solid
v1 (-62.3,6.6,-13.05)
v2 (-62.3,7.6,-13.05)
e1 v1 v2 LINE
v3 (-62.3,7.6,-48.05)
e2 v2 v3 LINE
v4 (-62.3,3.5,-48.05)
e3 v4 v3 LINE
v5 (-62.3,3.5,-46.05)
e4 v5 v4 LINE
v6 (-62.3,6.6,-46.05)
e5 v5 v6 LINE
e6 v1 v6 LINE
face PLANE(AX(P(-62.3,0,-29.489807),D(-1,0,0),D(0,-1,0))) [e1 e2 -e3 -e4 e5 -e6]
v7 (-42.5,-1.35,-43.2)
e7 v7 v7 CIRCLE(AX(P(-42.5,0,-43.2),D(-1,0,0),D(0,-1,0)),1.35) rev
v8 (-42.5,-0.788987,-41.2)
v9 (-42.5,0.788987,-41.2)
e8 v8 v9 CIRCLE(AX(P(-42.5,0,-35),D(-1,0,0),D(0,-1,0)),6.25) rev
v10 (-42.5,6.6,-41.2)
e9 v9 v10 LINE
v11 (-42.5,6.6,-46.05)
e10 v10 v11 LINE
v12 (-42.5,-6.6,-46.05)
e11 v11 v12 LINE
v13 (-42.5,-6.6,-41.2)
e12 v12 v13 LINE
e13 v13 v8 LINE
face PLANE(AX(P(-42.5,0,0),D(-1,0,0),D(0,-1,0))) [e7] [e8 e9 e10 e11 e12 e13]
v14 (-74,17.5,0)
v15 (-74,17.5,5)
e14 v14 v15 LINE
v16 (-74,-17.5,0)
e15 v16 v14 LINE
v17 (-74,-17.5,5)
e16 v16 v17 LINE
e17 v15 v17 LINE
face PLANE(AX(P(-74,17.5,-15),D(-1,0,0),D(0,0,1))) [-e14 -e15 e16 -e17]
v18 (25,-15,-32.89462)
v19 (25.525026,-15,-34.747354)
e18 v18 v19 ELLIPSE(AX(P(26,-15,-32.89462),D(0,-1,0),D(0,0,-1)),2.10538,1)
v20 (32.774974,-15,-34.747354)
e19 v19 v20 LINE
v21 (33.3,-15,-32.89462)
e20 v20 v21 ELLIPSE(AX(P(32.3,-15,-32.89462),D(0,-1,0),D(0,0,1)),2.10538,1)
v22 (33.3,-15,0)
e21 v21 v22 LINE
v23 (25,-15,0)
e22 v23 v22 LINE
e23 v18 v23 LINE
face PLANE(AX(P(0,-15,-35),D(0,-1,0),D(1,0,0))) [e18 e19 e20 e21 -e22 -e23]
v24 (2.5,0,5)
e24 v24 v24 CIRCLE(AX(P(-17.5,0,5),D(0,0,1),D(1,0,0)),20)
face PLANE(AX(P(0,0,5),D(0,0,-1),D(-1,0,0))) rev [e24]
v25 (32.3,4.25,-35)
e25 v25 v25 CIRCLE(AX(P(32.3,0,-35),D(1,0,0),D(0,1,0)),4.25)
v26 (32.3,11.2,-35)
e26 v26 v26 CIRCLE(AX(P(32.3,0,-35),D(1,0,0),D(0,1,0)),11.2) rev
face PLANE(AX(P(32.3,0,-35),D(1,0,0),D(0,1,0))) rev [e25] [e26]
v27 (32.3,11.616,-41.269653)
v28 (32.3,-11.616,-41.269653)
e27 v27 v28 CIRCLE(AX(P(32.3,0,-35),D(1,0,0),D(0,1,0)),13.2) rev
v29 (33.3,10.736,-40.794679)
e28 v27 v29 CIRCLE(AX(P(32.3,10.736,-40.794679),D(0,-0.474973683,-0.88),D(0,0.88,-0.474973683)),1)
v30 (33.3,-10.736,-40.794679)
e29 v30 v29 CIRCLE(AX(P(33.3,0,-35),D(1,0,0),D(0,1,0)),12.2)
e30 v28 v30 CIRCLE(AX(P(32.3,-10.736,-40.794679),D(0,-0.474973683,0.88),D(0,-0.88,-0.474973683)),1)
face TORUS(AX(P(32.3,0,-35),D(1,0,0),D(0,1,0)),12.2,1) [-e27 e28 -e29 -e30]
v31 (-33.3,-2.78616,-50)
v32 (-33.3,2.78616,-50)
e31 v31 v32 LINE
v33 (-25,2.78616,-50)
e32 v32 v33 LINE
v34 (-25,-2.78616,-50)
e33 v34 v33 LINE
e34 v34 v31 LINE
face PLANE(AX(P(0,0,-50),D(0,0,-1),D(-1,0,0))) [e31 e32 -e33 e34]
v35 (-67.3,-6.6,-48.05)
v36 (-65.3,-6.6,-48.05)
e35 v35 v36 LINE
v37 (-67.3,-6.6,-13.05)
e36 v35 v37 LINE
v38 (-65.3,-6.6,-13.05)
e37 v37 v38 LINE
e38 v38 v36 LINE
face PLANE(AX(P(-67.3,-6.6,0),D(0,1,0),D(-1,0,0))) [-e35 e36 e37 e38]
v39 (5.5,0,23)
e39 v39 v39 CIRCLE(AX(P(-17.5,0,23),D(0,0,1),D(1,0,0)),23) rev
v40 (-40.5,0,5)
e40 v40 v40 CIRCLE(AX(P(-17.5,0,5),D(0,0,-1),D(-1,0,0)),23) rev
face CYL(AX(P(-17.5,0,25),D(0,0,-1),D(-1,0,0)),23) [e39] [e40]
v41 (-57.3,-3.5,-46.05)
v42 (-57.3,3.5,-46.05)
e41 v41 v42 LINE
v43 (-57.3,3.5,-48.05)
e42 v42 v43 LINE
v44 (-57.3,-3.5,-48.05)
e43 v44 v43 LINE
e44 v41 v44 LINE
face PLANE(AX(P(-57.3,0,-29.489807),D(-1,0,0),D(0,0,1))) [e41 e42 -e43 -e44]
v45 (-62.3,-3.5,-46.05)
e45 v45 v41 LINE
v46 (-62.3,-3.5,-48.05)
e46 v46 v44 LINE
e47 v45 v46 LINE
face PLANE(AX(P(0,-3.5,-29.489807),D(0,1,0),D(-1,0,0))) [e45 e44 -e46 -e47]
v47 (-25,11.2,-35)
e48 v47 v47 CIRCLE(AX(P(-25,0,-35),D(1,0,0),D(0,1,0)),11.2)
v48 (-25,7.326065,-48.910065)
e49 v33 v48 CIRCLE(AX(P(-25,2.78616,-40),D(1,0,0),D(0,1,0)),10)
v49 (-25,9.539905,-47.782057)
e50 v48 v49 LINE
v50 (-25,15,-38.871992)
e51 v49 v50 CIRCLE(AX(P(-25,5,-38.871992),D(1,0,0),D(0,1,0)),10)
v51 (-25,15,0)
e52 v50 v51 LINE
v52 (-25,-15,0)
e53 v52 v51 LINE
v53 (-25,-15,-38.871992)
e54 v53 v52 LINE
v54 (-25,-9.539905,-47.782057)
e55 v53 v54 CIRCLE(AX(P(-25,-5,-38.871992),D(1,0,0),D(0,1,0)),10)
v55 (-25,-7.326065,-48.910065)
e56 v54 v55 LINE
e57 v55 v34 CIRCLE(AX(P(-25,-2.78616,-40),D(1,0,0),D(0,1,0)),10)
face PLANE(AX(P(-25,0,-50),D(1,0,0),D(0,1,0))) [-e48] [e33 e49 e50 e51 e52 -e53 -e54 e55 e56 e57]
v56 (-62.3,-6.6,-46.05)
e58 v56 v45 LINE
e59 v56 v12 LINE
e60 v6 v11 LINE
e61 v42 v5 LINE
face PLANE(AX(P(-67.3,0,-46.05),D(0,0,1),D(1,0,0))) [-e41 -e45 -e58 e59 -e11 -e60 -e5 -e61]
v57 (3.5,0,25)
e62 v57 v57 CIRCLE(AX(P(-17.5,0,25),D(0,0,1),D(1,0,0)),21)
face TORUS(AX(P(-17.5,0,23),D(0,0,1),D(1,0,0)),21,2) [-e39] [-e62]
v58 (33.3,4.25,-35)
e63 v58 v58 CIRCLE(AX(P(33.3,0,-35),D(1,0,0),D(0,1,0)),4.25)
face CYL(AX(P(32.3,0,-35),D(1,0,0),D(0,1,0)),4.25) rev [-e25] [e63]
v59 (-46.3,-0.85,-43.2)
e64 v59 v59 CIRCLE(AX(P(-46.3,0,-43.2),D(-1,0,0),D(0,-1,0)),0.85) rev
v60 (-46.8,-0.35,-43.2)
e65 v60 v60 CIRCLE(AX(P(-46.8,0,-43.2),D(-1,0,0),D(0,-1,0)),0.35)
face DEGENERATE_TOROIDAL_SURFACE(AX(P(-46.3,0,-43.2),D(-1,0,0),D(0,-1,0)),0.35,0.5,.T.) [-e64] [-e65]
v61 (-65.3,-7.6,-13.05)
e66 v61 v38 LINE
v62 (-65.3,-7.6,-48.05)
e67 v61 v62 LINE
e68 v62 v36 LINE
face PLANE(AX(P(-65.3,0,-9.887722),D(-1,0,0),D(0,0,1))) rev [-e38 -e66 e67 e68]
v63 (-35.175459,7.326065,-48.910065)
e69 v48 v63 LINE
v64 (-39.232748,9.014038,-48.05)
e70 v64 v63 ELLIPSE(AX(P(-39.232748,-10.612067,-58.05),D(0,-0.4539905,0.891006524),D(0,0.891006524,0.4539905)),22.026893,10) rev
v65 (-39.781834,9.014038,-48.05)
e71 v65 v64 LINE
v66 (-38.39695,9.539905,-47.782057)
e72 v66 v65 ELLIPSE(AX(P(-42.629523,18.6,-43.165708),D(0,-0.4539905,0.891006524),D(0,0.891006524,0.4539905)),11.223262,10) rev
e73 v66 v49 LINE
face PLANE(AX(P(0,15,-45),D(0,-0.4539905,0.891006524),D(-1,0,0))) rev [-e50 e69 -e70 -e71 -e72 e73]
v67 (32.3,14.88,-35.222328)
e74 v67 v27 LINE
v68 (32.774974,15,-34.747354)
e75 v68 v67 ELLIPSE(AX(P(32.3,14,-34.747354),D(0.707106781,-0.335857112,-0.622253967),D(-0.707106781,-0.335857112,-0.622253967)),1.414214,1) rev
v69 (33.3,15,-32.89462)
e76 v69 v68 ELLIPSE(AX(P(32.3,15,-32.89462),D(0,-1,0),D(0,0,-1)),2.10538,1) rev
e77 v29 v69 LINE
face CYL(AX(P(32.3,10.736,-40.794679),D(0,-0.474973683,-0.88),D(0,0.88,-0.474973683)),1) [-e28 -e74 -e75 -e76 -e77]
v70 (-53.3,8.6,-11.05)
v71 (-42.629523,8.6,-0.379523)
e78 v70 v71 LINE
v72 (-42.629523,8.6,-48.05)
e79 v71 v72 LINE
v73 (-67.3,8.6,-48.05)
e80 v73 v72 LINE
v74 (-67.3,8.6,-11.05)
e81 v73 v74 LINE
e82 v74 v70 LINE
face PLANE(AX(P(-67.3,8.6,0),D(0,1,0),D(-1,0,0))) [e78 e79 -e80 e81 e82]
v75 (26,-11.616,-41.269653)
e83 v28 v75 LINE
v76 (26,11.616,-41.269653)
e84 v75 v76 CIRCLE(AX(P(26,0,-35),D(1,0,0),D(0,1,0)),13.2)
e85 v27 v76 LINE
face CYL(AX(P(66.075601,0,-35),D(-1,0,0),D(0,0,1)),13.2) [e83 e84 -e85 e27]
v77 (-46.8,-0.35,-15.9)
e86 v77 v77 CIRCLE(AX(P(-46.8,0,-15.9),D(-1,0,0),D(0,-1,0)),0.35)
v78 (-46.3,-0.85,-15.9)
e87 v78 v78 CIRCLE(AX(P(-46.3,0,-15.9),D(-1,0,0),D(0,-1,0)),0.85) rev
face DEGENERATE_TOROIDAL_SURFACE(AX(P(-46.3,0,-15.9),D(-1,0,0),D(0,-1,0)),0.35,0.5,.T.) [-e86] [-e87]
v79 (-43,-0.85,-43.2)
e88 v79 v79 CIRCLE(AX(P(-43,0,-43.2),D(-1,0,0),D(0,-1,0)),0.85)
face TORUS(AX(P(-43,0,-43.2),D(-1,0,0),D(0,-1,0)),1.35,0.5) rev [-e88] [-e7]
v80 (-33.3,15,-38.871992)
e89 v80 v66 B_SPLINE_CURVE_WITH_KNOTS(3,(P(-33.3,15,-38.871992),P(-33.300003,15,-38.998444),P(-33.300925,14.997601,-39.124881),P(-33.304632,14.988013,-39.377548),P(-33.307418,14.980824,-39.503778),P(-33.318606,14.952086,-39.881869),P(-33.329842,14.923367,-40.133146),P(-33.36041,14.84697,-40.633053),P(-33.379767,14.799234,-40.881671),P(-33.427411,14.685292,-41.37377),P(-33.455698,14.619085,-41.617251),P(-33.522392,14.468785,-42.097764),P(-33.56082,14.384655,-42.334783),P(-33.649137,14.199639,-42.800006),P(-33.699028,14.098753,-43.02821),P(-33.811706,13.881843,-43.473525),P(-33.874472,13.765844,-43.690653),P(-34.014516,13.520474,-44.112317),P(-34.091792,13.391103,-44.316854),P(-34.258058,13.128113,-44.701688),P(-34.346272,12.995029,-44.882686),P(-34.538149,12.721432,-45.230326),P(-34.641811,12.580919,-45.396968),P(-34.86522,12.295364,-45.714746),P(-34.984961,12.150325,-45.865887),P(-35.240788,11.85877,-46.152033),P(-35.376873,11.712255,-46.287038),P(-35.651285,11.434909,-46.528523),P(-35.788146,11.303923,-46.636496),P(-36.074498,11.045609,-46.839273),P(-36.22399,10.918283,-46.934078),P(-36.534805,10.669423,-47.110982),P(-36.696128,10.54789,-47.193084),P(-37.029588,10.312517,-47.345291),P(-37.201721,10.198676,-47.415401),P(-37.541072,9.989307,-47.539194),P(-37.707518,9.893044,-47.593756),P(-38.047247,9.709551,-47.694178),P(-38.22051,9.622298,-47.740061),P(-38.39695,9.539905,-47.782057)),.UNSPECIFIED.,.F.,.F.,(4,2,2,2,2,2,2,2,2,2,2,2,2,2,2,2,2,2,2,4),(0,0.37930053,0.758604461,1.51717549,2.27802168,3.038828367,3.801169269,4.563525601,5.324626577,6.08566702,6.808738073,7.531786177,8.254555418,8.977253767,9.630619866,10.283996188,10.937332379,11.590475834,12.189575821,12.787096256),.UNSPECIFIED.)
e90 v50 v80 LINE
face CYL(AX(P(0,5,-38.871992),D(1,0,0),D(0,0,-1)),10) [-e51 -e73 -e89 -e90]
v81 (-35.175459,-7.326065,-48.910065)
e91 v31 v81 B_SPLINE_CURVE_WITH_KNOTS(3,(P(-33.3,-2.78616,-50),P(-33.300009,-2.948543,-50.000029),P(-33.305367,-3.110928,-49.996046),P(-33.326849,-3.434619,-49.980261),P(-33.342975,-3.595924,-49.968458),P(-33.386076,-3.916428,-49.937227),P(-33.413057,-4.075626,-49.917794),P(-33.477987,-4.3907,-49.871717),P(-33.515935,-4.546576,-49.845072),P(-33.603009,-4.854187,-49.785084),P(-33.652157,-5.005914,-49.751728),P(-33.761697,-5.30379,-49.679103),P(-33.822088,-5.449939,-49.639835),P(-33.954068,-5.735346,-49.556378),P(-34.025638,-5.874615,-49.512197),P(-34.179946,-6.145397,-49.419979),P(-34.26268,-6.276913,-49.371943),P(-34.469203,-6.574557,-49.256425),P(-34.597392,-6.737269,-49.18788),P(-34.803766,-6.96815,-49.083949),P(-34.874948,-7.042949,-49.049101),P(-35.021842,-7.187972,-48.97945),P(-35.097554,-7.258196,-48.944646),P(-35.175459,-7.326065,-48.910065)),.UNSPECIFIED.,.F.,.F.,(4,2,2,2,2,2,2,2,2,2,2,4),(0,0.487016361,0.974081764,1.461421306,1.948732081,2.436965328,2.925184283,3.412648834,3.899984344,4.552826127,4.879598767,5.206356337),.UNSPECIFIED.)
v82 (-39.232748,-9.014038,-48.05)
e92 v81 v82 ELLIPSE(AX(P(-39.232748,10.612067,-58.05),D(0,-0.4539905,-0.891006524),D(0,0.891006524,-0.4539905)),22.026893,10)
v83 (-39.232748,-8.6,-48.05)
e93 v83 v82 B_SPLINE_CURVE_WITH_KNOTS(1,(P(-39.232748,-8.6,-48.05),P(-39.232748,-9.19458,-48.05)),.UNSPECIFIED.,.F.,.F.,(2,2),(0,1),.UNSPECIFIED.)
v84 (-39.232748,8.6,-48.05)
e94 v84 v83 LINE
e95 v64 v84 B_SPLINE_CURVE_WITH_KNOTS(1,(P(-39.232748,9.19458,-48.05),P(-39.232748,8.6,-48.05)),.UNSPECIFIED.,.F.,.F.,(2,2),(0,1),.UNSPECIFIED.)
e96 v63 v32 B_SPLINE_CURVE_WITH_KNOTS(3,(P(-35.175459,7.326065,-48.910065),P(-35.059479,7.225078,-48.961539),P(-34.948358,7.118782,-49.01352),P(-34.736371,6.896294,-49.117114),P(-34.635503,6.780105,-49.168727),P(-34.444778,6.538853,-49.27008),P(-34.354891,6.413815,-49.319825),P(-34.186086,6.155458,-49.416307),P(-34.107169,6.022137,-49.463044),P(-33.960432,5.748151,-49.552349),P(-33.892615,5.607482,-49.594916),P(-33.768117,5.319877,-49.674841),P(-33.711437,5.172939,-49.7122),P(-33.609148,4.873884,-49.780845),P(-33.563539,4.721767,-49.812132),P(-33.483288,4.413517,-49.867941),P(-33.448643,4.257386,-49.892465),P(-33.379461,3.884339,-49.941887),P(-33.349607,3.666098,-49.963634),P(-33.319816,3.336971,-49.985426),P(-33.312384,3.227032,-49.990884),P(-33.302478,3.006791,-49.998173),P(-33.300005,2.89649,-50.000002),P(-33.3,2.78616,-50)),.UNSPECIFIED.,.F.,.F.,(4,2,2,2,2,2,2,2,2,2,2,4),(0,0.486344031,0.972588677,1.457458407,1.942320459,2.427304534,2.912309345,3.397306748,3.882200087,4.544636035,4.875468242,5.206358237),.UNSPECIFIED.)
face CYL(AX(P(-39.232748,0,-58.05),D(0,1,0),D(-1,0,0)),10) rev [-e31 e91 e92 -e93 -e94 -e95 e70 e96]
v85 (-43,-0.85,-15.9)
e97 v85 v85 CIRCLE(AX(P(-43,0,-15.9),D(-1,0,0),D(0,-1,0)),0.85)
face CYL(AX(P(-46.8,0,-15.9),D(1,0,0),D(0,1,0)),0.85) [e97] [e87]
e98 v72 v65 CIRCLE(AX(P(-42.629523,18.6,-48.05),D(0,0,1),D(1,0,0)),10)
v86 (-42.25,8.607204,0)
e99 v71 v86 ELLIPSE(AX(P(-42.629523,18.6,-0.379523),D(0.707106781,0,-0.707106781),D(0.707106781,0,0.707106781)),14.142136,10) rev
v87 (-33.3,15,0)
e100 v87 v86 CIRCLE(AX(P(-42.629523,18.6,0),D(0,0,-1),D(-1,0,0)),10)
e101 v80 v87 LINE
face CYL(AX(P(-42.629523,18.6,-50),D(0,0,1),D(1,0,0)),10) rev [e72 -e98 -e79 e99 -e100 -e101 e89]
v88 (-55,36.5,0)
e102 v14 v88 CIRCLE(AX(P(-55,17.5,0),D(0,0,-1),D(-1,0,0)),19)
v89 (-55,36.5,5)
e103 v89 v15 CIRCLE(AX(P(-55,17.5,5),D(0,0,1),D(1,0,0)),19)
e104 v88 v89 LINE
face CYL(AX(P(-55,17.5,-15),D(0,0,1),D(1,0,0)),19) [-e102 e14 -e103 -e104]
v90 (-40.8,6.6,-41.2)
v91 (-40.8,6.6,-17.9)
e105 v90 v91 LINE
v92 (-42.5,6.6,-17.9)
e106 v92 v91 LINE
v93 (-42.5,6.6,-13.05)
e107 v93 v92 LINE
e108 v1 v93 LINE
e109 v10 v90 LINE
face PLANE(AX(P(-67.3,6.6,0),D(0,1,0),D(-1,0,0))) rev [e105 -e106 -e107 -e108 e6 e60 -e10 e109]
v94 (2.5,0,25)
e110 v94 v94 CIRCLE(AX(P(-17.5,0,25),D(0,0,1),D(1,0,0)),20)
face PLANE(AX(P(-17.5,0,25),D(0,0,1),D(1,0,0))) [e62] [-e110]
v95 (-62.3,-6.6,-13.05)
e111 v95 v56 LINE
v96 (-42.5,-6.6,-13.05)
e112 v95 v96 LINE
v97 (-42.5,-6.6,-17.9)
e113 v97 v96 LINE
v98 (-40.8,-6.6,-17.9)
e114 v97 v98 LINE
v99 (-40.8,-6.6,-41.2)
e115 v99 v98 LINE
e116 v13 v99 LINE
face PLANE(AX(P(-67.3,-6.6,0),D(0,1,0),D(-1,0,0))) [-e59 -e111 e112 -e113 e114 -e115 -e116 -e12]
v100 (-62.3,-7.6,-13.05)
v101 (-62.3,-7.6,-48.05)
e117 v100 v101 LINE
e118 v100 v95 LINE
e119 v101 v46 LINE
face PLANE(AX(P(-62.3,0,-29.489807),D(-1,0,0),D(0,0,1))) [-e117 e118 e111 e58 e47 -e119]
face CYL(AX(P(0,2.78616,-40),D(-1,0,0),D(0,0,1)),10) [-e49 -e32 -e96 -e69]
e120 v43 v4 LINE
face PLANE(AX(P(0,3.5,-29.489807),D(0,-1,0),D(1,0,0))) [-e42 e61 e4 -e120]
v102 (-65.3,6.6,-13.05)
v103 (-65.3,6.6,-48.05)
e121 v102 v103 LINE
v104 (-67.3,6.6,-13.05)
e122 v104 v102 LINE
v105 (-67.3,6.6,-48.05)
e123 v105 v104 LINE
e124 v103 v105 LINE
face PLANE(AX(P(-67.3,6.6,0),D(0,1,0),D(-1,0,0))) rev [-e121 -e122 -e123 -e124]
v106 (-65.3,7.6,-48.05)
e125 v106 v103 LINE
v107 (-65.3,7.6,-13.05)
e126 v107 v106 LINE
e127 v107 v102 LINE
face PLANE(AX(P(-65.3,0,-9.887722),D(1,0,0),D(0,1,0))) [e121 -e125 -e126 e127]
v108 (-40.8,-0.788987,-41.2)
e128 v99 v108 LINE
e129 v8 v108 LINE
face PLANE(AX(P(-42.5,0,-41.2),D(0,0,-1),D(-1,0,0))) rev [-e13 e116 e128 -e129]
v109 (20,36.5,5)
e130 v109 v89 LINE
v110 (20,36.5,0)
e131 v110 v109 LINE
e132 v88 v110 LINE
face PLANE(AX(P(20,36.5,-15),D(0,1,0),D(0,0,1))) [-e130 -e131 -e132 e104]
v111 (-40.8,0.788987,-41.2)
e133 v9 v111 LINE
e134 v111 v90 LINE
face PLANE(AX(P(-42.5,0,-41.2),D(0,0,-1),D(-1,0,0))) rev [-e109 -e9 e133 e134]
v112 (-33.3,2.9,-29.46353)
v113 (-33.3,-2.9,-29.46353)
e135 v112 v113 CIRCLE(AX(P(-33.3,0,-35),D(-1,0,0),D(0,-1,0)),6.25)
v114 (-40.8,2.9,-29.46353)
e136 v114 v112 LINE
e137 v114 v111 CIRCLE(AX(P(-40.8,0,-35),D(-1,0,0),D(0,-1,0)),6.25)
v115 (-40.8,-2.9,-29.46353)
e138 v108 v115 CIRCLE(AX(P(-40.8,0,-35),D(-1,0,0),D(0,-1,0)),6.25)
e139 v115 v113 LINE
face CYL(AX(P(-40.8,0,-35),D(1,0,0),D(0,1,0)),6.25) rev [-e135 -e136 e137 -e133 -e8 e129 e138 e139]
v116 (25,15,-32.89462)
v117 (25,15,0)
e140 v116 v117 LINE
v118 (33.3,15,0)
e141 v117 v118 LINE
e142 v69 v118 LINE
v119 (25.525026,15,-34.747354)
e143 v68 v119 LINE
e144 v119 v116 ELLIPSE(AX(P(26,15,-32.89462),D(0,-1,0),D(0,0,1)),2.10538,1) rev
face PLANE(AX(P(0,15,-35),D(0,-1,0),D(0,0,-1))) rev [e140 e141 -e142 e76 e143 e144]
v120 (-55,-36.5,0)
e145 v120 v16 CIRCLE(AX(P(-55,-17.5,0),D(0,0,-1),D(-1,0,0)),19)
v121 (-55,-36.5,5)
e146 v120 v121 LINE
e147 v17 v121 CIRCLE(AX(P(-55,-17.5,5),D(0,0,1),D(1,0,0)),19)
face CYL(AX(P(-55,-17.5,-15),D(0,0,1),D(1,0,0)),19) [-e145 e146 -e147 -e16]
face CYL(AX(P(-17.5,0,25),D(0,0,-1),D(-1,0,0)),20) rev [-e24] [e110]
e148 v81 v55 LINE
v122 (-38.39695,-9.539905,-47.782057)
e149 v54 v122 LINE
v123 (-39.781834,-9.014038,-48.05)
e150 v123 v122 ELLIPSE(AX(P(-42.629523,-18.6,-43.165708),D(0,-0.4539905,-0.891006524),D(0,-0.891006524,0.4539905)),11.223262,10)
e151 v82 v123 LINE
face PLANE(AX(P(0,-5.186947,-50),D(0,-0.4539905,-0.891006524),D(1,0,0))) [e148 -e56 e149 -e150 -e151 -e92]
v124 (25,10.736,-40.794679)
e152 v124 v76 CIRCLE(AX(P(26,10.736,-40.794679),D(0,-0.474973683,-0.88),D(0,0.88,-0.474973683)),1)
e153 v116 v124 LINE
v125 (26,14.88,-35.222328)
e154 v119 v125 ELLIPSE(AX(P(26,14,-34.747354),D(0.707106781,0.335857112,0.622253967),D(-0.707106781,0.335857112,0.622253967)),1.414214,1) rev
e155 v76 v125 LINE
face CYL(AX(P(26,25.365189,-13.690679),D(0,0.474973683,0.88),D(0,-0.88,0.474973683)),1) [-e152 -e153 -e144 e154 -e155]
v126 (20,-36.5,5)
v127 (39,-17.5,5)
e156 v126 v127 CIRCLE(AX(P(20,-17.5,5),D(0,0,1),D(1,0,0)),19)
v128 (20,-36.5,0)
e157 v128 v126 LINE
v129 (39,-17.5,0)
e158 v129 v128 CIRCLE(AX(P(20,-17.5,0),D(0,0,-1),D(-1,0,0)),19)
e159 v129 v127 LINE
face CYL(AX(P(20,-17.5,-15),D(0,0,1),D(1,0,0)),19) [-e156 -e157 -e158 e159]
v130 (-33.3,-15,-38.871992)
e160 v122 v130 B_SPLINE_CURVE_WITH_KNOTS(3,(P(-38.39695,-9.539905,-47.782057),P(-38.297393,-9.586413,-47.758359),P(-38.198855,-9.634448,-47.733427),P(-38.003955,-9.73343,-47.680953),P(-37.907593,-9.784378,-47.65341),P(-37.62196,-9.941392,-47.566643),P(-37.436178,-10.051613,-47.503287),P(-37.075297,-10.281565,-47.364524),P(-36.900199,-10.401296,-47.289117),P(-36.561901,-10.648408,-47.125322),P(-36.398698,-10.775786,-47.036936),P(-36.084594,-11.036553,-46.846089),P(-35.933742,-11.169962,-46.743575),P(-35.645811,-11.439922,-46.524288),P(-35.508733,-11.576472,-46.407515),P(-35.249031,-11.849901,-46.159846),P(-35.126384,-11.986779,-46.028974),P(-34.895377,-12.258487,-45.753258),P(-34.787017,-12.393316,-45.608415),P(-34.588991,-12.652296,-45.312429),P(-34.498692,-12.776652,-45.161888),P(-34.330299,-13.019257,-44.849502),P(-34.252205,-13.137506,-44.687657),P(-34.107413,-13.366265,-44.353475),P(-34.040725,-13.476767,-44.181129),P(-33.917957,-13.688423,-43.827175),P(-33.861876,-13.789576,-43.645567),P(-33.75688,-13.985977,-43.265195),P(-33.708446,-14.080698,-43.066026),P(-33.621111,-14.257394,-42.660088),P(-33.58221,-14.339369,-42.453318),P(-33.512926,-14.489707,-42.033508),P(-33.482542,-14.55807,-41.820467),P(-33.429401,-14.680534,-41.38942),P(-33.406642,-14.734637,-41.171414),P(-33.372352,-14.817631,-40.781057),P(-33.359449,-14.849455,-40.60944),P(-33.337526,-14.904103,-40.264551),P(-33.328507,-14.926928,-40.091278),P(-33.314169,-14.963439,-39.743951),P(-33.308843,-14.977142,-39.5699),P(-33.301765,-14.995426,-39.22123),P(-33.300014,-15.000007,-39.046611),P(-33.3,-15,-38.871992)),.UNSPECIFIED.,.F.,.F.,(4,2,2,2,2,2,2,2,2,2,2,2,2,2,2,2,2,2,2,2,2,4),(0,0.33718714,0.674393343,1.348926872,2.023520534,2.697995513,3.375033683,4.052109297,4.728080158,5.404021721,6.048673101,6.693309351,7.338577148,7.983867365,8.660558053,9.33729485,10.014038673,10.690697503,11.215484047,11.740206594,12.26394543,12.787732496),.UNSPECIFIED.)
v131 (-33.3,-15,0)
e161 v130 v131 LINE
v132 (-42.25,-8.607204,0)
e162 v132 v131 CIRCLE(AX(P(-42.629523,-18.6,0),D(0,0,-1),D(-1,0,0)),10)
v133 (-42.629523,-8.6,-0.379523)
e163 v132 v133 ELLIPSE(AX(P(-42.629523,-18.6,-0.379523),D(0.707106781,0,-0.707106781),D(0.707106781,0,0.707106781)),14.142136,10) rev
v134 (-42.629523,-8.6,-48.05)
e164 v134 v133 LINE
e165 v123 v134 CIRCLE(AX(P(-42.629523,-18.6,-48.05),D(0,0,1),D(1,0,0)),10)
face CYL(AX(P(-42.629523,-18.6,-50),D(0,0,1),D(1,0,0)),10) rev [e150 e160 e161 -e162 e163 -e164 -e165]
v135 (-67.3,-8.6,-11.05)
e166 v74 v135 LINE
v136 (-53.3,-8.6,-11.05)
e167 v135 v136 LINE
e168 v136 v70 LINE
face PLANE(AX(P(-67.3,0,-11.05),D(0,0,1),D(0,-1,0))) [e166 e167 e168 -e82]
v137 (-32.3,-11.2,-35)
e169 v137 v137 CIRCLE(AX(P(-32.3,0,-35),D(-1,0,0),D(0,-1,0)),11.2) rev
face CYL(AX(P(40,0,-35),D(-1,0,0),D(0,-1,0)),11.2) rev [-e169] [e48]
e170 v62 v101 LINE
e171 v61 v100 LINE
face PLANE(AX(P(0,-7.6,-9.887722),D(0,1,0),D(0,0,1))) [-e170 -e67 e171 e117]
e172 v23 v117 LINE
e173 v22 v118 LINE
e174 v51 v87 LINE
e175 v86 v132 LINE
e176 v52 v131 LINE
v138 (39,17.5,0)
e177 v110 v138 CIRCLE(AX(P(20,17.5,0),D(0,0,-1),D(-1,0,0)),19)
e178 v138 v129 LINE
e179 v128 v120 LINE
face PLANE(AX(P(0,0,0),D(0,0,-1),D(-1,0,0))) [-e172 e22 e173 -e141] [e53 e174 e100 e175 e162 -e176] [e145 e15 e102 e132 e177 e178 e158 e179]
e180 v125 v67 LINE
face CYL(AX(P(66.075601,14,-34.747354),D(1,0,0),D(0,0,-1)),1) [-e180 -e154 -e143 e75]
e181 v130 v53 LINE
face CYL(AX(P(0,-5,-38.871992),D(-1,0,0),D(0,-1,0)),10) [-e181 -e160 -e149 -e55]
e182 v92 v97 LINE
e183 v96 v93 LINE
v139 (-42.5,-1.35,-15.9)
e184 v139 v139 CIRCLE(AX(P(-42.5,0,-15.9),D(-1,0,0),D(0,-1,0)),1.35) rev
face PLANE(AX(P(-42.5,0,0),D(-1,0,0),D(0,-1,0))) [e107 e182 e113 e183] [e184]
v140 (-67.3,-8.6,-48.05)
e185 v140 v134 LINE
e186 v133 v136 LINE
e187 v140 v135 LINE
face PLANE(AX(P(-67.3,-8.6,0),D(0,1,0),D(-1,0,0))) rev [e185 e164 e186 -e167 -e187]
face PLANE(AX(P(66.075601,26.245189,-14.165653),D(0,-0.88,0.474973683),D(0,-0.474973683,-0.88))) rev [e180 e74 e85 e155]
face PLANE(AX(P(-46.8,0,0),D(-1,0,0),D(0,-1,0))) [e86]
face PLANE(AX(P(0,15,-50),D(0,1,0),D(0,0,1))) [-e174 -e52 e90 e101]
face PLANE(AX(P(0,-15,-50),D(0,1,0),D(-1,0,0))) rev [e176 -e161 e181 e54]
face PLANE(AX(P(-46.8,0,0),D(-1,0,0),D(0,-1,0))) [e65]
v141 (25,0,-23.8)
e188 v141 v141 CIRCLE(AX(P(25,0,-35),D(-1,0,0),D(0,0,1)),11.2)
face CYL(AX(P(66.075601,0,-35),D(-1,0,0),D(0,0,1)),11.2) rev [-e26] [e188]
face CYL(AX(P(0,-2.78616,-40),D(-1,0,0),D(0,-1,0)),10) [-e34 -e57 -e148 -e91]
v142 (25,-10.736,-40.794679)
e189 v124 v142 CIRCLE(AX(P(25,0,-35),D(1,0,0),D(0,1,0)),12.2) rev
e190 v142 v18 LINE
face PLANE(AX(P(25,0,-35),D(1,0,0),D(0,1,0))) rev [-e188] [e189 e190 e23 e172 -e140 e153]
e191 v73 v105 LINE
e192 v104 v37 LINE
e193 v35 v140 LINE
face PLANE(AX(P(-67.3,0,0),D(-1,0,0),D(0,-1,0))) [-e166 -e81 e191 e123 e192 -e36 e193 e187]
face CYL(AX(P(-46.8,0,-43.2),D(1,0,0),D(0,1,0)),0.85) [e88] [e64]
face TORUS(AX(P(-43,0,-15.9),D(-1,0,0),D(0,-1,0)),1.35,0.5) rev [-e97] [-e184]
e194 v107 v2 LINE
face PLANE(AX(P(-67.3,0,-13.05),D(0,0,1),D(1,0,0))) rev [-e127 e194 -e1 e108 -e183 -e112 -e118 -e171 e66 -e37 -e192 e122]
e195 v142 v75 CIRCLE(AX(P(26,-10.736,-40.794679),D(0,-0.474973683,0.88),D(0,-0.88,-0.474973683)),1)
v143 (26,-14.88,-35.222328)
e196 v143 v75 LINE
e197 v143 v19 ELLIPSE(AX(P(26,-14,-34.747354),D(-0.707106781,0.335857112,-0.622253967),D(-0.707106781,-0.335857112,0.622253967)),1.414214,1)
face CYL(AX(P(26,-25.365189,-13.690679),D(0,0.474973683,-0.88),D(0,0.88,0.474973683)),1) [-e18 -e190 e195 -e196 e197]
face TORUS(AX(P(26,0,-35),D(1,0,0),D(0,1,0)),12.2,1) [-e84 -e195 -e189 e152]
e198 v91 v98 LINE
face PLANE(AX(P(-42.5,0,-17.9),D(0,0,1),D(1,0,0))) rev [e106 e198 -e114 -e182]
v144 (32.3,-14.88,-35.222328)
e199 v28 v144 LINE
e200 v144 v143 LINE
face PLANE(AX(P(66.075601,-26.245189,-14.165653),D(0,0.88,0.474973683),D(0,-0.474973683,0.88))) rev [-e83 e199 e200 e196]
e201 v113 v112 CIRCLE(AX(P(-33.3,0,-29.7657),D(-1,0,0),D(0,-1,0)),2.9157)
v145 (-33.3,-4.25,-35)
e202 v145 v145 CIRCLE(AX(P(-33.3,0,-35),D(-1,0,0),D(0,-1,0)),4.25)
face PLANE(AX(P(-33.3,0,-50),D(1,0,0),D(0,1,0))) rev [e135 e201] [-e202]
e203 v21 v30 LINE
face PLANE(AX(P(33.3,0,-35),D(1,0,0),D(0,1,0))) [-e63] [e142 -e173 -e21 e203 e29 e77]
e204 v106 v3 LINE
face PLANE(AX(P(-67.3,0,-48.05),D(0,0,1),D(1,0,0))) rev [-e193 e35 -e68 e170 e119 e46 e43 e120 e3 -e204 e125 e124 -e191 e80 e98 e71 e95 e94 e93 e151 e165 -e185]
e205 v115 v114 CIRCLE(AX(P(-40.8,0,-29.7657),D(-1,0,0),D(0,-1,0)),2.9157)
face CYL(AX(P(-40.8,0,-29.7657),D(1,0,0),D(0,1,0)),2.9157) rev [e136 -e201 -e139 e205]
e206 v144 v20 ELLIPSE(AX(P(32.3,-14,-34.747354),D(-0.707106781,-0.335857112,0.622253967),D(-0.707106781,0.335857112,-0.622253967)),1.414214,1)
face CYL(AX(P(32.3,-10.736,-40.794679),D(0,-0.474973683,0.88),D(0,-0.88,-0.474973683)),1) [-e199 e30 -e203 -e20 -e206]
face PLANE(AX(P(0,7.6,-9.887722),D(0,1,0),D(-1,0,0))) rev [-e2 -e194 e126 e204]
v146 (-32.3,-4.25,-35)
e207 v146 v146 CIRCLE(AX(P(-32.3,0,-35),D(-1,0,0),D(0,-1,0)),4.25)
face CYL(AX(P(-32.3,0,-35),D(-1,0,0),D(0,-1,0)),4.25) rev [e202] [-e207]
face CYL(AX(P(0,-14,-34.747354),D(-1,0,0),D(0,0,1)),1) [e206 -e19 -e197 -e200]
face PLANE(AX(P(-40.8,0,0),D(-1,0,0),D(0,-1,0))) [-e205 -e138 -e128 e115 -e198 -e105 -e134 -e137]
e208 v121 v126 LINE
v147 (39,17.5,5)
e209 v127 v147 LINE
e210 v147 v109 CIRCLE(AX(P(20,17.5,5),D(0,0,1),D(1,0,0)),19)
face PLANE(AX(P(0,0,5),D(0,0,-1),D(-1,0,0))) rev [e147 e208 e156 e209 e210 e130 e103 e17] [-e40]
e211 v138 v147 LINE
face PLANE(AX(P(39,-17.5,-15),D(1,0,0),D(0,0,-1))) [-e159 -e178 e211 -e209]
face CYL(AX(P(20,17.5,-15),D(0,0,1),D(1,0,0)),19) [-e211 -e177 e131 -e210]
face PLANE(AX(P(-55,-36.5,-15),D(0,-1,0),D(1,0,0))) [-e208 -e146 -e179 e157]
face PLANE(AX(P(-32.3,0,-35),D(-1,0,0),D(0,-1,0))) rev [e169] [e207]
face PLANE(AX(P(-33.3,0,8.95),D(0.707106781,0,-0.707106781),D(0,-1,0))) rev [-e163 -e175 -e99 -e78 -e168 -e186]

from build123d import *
from OCP.BRepAlgoAPI import BRepAlgoAPI_Cut
from OCP.TopTools import TopTools_ListOfShape

# Parameters (mm, degrees)
CROQUIS2_W               = 75
CROQUIS2_H               = 115
SALIENTE_EXTRUIR1_DEPTH  = 5
CROQUIS3_W               = 8.3
CROQUIS3_H               = 30
SALIENTE_EXTRUIR2_DEPTH  = 35
SALIENTE_EXTRUIR4_DEPTH  = 8.3
REDONDEO4_R              = 1
CORTAR_EXTRUIR1_DEPTH    = 118.172906425
CROQUIS3_3_W             = 8.3
CROQUIS3_3_H             = 30
SALIENTE_EXTRUIR6_DEPTH  = 50
CROQUIS8_R               = 11.2
CORTAR_EXTRUIR2_DEPTH    = 97.328292832
SALIENTE_EXTRUIR9_START  = -1
CROQUIS14_R              = 11.2
CROQUIS14_R_2            = 4.25
SALIENTE_EXTRUIR9_DEPTH  = 1
CROQUIS15_R              = 11.2
CROQUIS15_R_2            = 4.25
SALIENTE_EXTRUIR10_DEPTH = 1
CROQUIS9_W               = 17.2
CROQUIS9_H               = 37
CROQUIS9_W_2             = 13.2
CROQUIS9_H_2             = 33
SALIENTE_EXTRUIR11_DEPTH = 34
CROQUIS9_5_W             = 13.2
CROQUIS9_5_H             = 33
SALIENTE_EXTRUIR12_DEPTH = 7.5
CROQUIS16_W              = 13.2
CROQUIS16_H              = 4.85
CROQUIS16_R              = 0.85
SALIENTE_EXTRUIR13_DEPTH = 1.7
CROQUIS16_3_R            = 0.85
SALIENTE_EXTRUIR14_DEPTH = 6
REDONDEO5_R              = 0.5
CORTAR_EXTRUIR3_DEPTH    = 2
CROQUIS17_4_W            = 3
CROQUIS17_4_H            = 1
CORTAR_EXTRUIR4_DEPTH    = 35
REDONDEO6_R              = 10
CHAFL_N1_START           = -15.000000634
CHAFL_N1_DEPTH           = 30.000000634
CHAFL_N1_START_2         = -11.05
CHAFL_N1_2_DEPTH         = 11.05
CHAFL_N2_SIZE            = 5
CHAFL_N2_SIZE_2          = 9.813052528
CHAFL_N3_SIZE            = 9.813052528
CHAFL_N3_SIZE_2          = 5
REDONDEO7_R              = 10
REDONDEO8_R              = 10
REDONDEO9_R              = 20
SKETCH3_R                = 23
SKETCH3_R_2              = 20
BOSS_EXTRUDE1_DEPTH      = 20
CUT_EXTRUDE1_DEPTH       = 20
FILLET1_R                = 2


with BuildPart() as part:
    # Croquis2 → Saliente-Extruir1 (new body)
    with BuildSketch(Plane(origin=(0, 0, 0), x_dir=(0, 1, 0), z_dir=(0, 0, 1))):
        with Locations((0, 17.5)):
            Rectangle(CROQUIS2_W, CROQUIS2_H)
    extrude(amount=SALIENTE_EXTRUIR1_DEPTH)

    # Croquis3 → Saliente-Extruir2 (add)
    with BuildSketch(Plane(origin=(0, 0, 0), x_dir=(1, 0, 0), z_dir=(0, 0, -1))):
        with Locations((29.15, 0)):
            Rectangle(CROQUIS3_W, CROQUIS3_H)
    extrude(amount=SALIENTE_EXTRUIR2_DEPTH)

    # Croquis4 → Saliente-Extruir4 (add)
    with BuildSketch(Plane(origin=(25, 0, 0), x_dir=(0, -1, 0), z_dir=(-1, 0, 0))):
        with BuildLine():
            Line((11.616, -41.269652622), (15, -35))
            Line((15, -35), (11.2, -35))
            ThreePointArc((11.2, -35), (0, -46.2), (-11.2, -35))
            Line((-11.2, -35), (-15, -35))
            Line((-15, -35), (-11.616, -41.269652622))
            ThreePointArc((-11.616, -41.269652622), (0, -48.2), (11.616, -41.269652622))
        make_face()
    extrude(amount=-SALIENTE_EXTRUIR4_DEPTH)

    # Redondeo4
    redondeo4_edges = [part.edges().sort_by_distance(p)[0] for p in [
        (29.15, -15, -35),
        (29.15, 15, -35),
        (25, -13.308, -38.134826311),
        (33.3, 0, -48.2),
        (25, 13.308, -38.134826311),
        (25, 0, -48.2),
        (33.3, -13.308, -38.134826311),
        (33.3, 13.308, -38.134826311),
    ]]
    fillet(redondeo4_edges, radius=REDONDEO4_R)

    # Croquis4<6> → Cortar-Extruir1 (cut, through all)
    with BuildSketch(Plane(origin=(25, 0, 0), x_dir=(0, -1, 0), z_dir=(-1, 0, 0))):
        with BuildLine():
            ThreePointArc((-11.2, -35), (0, -46.2), (11.2, -35))
            Line((11.2, -35), (-11.2, -35))
        make_face()
        with BuildLine():
            Line((-11.2, -35), (11.2, -35))
            ThreePointArc((11.2, -35), (0, -23.8), (-11.2, -35))
        make_face()
    extrude(amount=-CORTAR_EXTRUIR1_DEPTH, mode=Mode.SUBTRACT)

    # Croquis3<3> → Saliente-Extruir6 (add)
    with BuildSketch(Plane(origin=(0, 0, 0), x_dir=(1, 0, 0), z_dir=(0, 0, -1))):
        with Locations((-29.15, 0)):
            Rectangle(CROQUIS3_3_W, CROQUIS3_3_H)
    extrude(amount=SALIENTE_EXTRUIR6_DEPTH)

    # Croquis8 → Cortar-Extruir2 (cut, through all)
    with BuildSketch(Plane(origin=(-33.3, 0, 0), x_dir=(0, -1, 0), z_dir=(-1, 0, 0))):
        with Locations(Location((0, -35, 0), (0, 0, 90))):
            Circle(CROQUIS8_R)
    extrude(amount=-CORTAR_EXTRUIR2_DEPTH, mode=Mode.SUBTRACT)

    # Croquis14 → Saliente-Extruir9 (add)
    with BuildSketch(Plane.YZ.offset(33.3).offset(SALIENTE_EXTRUIR9_START)):
        with Locations(Location((0, -35, 0), (0, 0, 90))):
            Circle(CROQUIS14_R)
        with Locations((0, -35)):
            Circle(CROQUIS14_R_2, mode=Mode.SUBTRACT)
    extrude(amount=SALIENTE_EXTRUIR9_DEPTH)

    # Croquis15 → Saliente-Extruir10 (add)
    with BuildSketch(Plane(origin=(-33.3, 0, 0), x_dir=(0, -1, 0), z_dir=(-1, 0, 0))):
        with Locations((0, -35)):
            Circle(CROQUIS15_R)
        with Locations(Location((0, -35, 0), (0, 0, 180))):
            Circle(CROQUIS15_R_2, mode=Mode.SUBTRACT)
    extrude(amount=-SALIENTE_EXTRUIR10_DEPTH)

    # Croquis9 → Saliente-Extruir11 (add)
    with BuildSketch(Plane(origin=(-33.3, 0, 0), x_dir=(0, -1, 0), z_dir=(-1, 0, 0))):
        with Locations((0, -29.55)):
            Rectangle(CROQUIS9_W, CROQUIS9_H)
        with Locations((0, -29.55)):
            Rectangle(CROQUIS9_W_2, CROQUIS9_H_2, mode=Mode.SUBTRACT)
    extrude(amount=SALIENTE_EXTRUIR11_DEPTH)

    # Croquis9<5> → Saliente-Extruir12 (add)
    with BuildSketch(Plane(origin=(-33.3, 0, 0), x_dir=(0, -1, 0), z_dir=(-1, 0, 0))):
        with Locations((0, -29.55)):
            Rectangle(CROQUIS9_5_W, CROQUIS9_5_H)
        with BuildLine():
            ThreePointArc((-2.9, -29.463530005), (0, -41.25), (2.9, -29.463530005))
            ThreePointArc((2.9, -29.463530005), (0, -26.85), (-2.9, -29.463530005))
        make_face(mode=Mode.SUBTRACT)
    extrude(amount=SALIENTE_EXTRUIR12_DEPTH)

    # Croquis16 → Saliente-Extruir13 (add)
    # profile 1 of 4: a face of its own
    with BuildSketch(Plane(origin=(-40.8, 0, 0), x_dir=(0, -1, 0), z_dir=(-1, 0, 0))):
        with Locations((0, -15.475)):
            Rectangle(CROQUIS16_W, CROQUIS16_H)
        with Locations((0, -15.9)):
            Circle(CROQUIS16_R, mode=Mode.SUBTRACT)
    # profile 2 of 4: a face of its own
    with BuildSketch(Plane(origin=(-40.8, 0, 0), x_dir=(0, -1, 0), z_dir=(-1, 0, 0))):
        with Locations((0, -15.9)):
            Circle(CROQUIS16_R)
    # profile 3 of 4: a face of its own
    with BuildSketch(Plane(origin=(-40.8, 0, 0), x_dir=(0, -1, 0), z_dir=(-1, 0, 0))):
        with BuildLine():
            Line((-0.788986692, -41.2), (-6.6, -41.2))
            Line((-6.6, -41.2), (-6.6, -46.05))
            Line((-6.6, -46.05), (6.6, -46.05))
            Line((6.6, -46.05), (6.6, -41.2))
            Line((6.6, -41.2), (0.788986692, -41.2))
            ThreePointArc((0.788986692, -41.2), (0, -41.25), (-0.788986692, -41.2))
        make_face()
        with Locations((0, -43.2)):
            Circle(CROQUIS16_R, mode=Mode.SUBTRACT)
    # profile 4 of 4: a face of its own
    with BuildSketch(Plane(origin=(-40.8, 0, 0), x_dir=(0, -1, 0), z_dir=(-1, 0, 0))):
        with Locations((0, -43.2)):
            Circle(CROQUIS16_R)
    extrude(amount=SALIENTE_EXTRUIR13_DEPTH)

    # Croquis16<3> → Saliente-Extruir14 (add)
    with BuildSketch(Plane(origin=(-40.8, 0, 0), x_dir=(0, -1, 0), z_dir=(-1, 0, 0))):
        with Locations((0, -15.9)):
            Circle(CROQUIS16_3_R)
        with Locations((0, -43.2)):
            Circle(CROQUIS16_3_R)
    extrude(amount=SALIENTE_EXTRUIR14_DEPTH)

    # Redondeo5
    redondeo5_edges = [part.edges().sort_by_distance(p)[0] for p in [
        (-42.5, 0.85, -15.9),
        (-46.8, 0.85, -15.9),
        (-42.5, 0.85, -43.2),
        (-46.8, 0.85, -43.2),
    ]]
    fillet(redondeo5_edges, radius=REDONDEO5_R)

    # Croquis17 → Cortar-Extruir3 (cut)
    with BuildSketch(Plane(origin=(0, 0, -48.05), x_dir=(1, 0, 0), z_dir=(0, 0, -1))):
        Polygon((-67.3, -6.6), (-62.3, -6.6), (-62.3, -3.5), (-57.3, -3.5), (-57.3, 3.5), (-62.3, 3.5), (-62.3, 6.6), (-67.3, 6.6), align=None)
    extrude(amount=-CORTAR_EXTRUIR3_DEPTH, mode=Mode.SUBTRACT)

    # Croquis17<4> → Cortar-Extruir4 (cut)
    with BuildSketch(Plane(origin=(0, 0, -48.05), x_dir=(1, 0, 0), z_dir=(0, 0, -1))):
        with Locations((-63.8, 7.1)):
            Rectangle(CROQUIS17_4_W, CROQUIS17_4_H)
        with Locations((-63.8, -7.1)):
            Rectangle(CROQUIS17_4_W, CROQUIS17_4_H)
    extrude(amount=-CORTAR_EXTRUIR4_DEPTH, mode=Mode.SUBTRACT)

    # Redondeo6
    # the kernel refuses this fillet: 10 mm, written as the material it adds along each edge
    with BuildSketch(Plane(origin=(-33.3, -8.6, -48.05), x_dir=(-1, 0, 0), z_dir=(0, 1, 0))) as redondeo6_piece_1:
        with BuildLine():
            CenterArc((5.932748098, -10), REDONDEO6_R, 90, 36.389744678)
            Line((0, -1.95), (0, 0))
            Line((0, 0), (5.932748098, 0))
        make_face()
    extrude(amount=17.2)
    with BuildSketch(Plane(origin=(-33.3, -8.6, -11.05), x_dir=(-1, 0, 0), z_dir=(0, 0, -1)), Plane(origin=(-33.3, 8.6, -48.05), x_dir=(-1, 0, 0), z_dir=(0, 0, 1))) as redondeo6_piece_2:
        with BuildLine():
            CenterArc((9.329523032, -10), REDONDEO6_R, 90, 68.899803976)
            Line((0, -6.4), (0, 0))
            Line((0, 0), (9.329523032, 0))
        make_face()
    extrude(amount=37)
    with BuildSketch(Plane(origin=(-33.3, -23.431870246, -48.05), x_dir=(-1, 0, 0), z_dir=(0, 1, 0))) as redondeo6_piece_3a_section:
        with BuildLine():
            CenterArc((5.932748098, -10), REDONDEO6_R, 90, 36.389744678)
            Line((0, -1.95), (0, 0))
            Line((0, 0), (5.932748098, 0))
        make_face()
    redondeo6_piece_3a = extrude(amount=32.031870246, mode=Mode.PRIVATE)
    redondeo6_piece_3a = split(redondeo6_piece_3a, bisect_by=Plane(origin=(-33.3, -8.6, -48.05), z_dir=(0, -1, 0)), keep=Keep.TOP, mode=Mode.PRIVATE)
    redondeo6_piece_3a = split(redondeo6_piece_3a, bisect_by=Plane(origin=(-33.3, -15, -48.05), z_dir=(0, 1, 0)), keep=Keep.TOP, mode=Mode.PRIVATE)
    with BuildSketch(Plane(origin=(-33.3, -8.6, -11.05), x_dir=(-1, 0, 0), z_dir=(0, 0, -1))) as redondeo6_piece_3b_section:
        with BuildLine():
            CenterArc((9.329523032, -10), REDONDEO6_R, 90, 68.899803976)
            Line((0, -6.4), (0, 0))
            Line((0, 0), (9.329523032, 0))
        make_face()
    redondeo6_piece_3b = extrude(amount=60.323807579, mode=Mode.PRIVATE)
    redondeo6_piece_3b = split(redondeo6_piece_3b, bisect_by=Plane(origin=(-33.3, -8.6, -48.05), z_dir=(0, 0, -1)), keep=Keep.TOP, mode=Mode.PRIVATE)
    redondeo6_piece_3b = split(redondeo6_piece_3b, bisect_by=Plane(origin=(-33.3, -8.6, -50), z_dir=(0, 0, 1)), keep=Keep.TOP, mode=Mode.PRIVATE)
    redondeo6_piece_3 = redondeo6_piece_3a & redondeo6_piece_3b
    add(redondeo6_piece_3)
    with BuildSketch(Plane(origin=(-33.3, -8.6, -48.05), x_dir=(-1, 0, 0), z_dir=(0, 1, 0))) as redondeo6_piece_4a_section:
        with BuildLine():
            CenterArc((5.932748098, -10), REDONDEO6_R, 90, 36.389744678)
            Line((0, -1.95), (0, 0))
            Line((0, 0), (5.932748098, 0))
        make_face()
    redondeo6_piece_4a = extrude(amount=32.031870246, mode=Mode.PRIVATE)
    redondeo6_piece_4a = split(redondeo6_piece_4a, bisect_by=Plane(origin=(-33.3, 8.6, -48.05), z_dir=(0, 1, 0)), keep=Keep.TOP, mode=Mode.PRIVATE)
    redondeo6_piece_4a = split(redondeo6_piece_4a, bisect_by=Plane(origin=(-33.3, 15, -48.05), z_dir=(0, -1, 0)), keep=Keep.TOP, mode=Mode.PRIVATE)
    with BuildSketch(Plane(origin=(-33.3, 8.6, -71.373807579), x_dir=(-1, 0, 0), z_dir=(0, 0, 1))) as redondeo6_piece_4b_section:
        with BuildLine():
            CenterArc((9.329523032, -10), REDONDEO6_R, 90, 68.899803976)
            Line((0, -6.4), (0, 0))
            Line((0, 0), (9.329523032, 0))
        make_face()
    redondeo6_piece_4b = extrude(amount=60.323807579, mode=Mode.PRIVATE)
    redondeo6_piece_4b = split(redondeo6_piece_4b, bisect_by=Plane(origin=(-33.3, 8.6, -48.05), z_dir=(0, 0, -1)), keep=Keep.TOP, mode=Mode.PRIVATE)
    redondeo6_piece_4b = split(redondeo6_piece_4b, bisect_by=Plane(origin=(-33.3, 8.6, -50), z_dir=(0, 0, 1)), keep=Keep.TOP, mode=Mode.PRIVATE)
    redondeo6_piece_4 = redondeo6_piece_4a & redondeo6_piece_4b
    add(redondeo6_piece_4)


with BuildPart() as chafl_n1_tool:
    # Chaflán1: read off the stored shape, not the designer's step
    # Chaflán1 outline → Chaflán1 (new body)
    with BuildSketch(Plane(origin=(0, 0, 0), x_dir=(1, 0, 0), z_dir=(0, 1, 0)).offset(CHAFL_N1_START)):
        Polygon((-53.3, 11.05), (-42.25, 0), (-33.3, 0), (-33.3, 11.05), align=None)
    extrude(amount=CHAFL_N1_DEPTH)


with BuildPart() as part_1:
    add(part.part)


with BuildPart() as part_2:
    # Chaflán1: joined with chafl_n1_tool
    add(part_1.part.fuse(chafl_n1_tool.part, tol=0.00001))


with BuildPart() as chafl_n1_2_tool:
    # Chafl_n1 2 outline → Chafl_n1 2 (new body)
    with BuildSketch(Plane.XY.offset(CHAFL_N1_START_2)):
        with BuildLine():
            Line((-55, 8.6), (-42.629523032, 8.6))
            ThreePointArc((-42.629523032, 8.6), (-36.972668782, 10.353788749), (-33.3, 15))
            Line((-33.3, 15), (-55, 15))
            Line((-55, 15), (-55, 8.6))
        make_face()
        with BuildLine():
            Line((-42.629523032, -8.6), (-55, -8.6))
            Line((-55, -8.6), (-55, -15.000000634))
            Line((-55, -15.000000634), (-33.299999925, -15.000000195))
            ThreePointArc((-33.299999925, -15.000000195), (-36.972668696, -10.353788808), (-42.629523032, -8.6))
        make_face()
    extrude(amount=CHAFL_N1_2_DEPTH)


with BuildPart() as part_3:
    add(part_2.part)

    # Chafl_n1 2: cut by chafl_n1_2_tool, with a tolerance
    chafl_n1_2_stock = TopTools_ListOfShape()
    chafl_n1_2_stock.Append(part_3.part.wrapped)
    chafl_n1_2_tools = TopTools_ListOfShape()
    chafl_n1_2_tools.Append(chafl_n1_2_tool.part.wrapped)
    chafl_n1_2_cut = BRepAlgoAPI_Cut()
    chafl_n1_2_cut.SetArguments(chafl_n1_2_stock)
    chafl_n1_2_cut.SetTools(chafl_n1_2_tools)
    chafl_n1_2_cut.SetFuzzyValue(0.00001)
    chafl_n1_2_cut.Build()
    add(Compound.cast(chafl_n1_2_cut.Shape()).solids(), mode=Mode.REPLACE)

    # Chaflán2
    # the kernel refuses this chamfer: 9.813052528, 5 mm, written as the material it takes off along each edge
    with BuildSketch(Plane(origin=(-58.710886279, -15, -50), x_dir=(0, 0, 1), z_dir=(1, 0, 0))) as chafl_n2_piece_1:
        Polygon((CHAFL_N2_SIZE, 0), (0, -CHAFL_N2_SIZE_2), (0, 0), align=None)
    extrude(amount=59.121772559, mode=Mode.SUBTRACT)

    # Chaflán3
    # the kernel refuses this chamfer: 9.813052528, 5 mm, written as the material it takes off along each edge
    with BuildSketch(Plane(origin=(0.410886279, 15, -50), x_dir=(0, -1, 0), z_dir=(-1, 0, 0))) as chafl_n3_piece_1:
        Polygon((CHAFL_N3_SIZE, 0), (0, CHAFL_N3_SIZE_2), (0, 0), align=None)
    extrude(amount=59.121772559, mode=Mode.SUBTRACT)

    # Redondeo7
    redondeo7_edges = [part_3.edges().sort_by_distance(p)[0] for p in [
        (-29.15, 5.186947472, -50),
        (-29.15, -5.186947472, -50),
    ]]
    fillet(redondeo7_edges, radius=REDONDEO7_R)

    # Redondeo8
    redondeo8_edges = [part_3.edges().sort_by_distance(p)[0] for p in [
        (-29.15, 15, -45),
        (-29.15, -15, -45),
    ]]
    fillet(redondeo8_edges, radius=REDONDEO8_R)

    # Redondeo9
    redondeo9_edges = [part_3.edges().sort_by_distance(p)[0] for p in [
        (40, 37.5, 2.5),
        (40, -37.5, 2.5),
        (-75, -37.5, 2.5),
        (-75, 37.5, 2.5),
    ]]
    fillet(redondeo9_edges, radius=REDONDEO9_R)

    # Sketch3 → Boss-Extrude1 (add)
    with BuildSketch(Plane.XY.offset(5)):
        with Locations(Location((-17.5, 0, 0), (0, 0, 180))):
            Circle(SKETCH3_R)
        with Locations((-17.5, 0)):
            Circle(SKETCH3_R_2, mode=Mode.SUBTRACT)
    extrude(amount=BOSS_EXTRUDE1_DEPTH)

    # Sketch5 → Cut-Extrude1 (cut)
    with BuildSketch(Plane.XY.offset(5)):
        with BuildLine():
            Line((40, -17.5), (40, 17.5))
            ThreePointArc((40, 17.5), (34.142135624, 31.642135624), (20, 37.5))
            Line((20, 37.5), (-55, 37.5))
            ThreePointArc((-55, 37.5), (-69.142135624, 31.642135624), (-75, 17.5))
            Line((-75, 17.5), (-75, -17.5))
            ThreePointArc((-75, -17.5), (-69.142135624, -31.642135624), (-55, -37.5))
            Line((-55, -37.5), (20, -37.5))
            ThreePointArc((20, -37.5), (34.142135624, -31.642135624), (40, -17.5))
        make_face()
        with BuildLine():
            Line((20, 36.5), (-55, 36.5))
            ThreePointArc((-55, 36.5), (-68.435028843, 30.935028843), (-74, 17.5))
            Line((-74, 17.5), (-74, -17.5))
            ThreePointArc((-74, -17.5), (-68.435028843, -30.935028843), (-55, -36.5))
            Line((-55, -36.5), (20, -36.5))
            ThreePointArc((20, -36.5), (33.435028843, -30.935028843), (39, -17.5))
            Line((39, -17.5), (39, 17.5))
            ThreePointArc((39, 17.5), (33.435028843, 30.935028843), (20, 36.5))
        make_face(mode=Mode.SUBTRACT)
    extrude(amount=-CUT_EXTRUDE1_DEPTH, mode=Mode.SUBTRACT)

    # Fillet1
    fillet1_edges = [part_3.edges().sort_by_distance(p)[0] for p in [
        (5.5, 0, 25),
    ]]
    fillet(fillet1_edges, radius=FILLET1_R)


solid = part_3.part
